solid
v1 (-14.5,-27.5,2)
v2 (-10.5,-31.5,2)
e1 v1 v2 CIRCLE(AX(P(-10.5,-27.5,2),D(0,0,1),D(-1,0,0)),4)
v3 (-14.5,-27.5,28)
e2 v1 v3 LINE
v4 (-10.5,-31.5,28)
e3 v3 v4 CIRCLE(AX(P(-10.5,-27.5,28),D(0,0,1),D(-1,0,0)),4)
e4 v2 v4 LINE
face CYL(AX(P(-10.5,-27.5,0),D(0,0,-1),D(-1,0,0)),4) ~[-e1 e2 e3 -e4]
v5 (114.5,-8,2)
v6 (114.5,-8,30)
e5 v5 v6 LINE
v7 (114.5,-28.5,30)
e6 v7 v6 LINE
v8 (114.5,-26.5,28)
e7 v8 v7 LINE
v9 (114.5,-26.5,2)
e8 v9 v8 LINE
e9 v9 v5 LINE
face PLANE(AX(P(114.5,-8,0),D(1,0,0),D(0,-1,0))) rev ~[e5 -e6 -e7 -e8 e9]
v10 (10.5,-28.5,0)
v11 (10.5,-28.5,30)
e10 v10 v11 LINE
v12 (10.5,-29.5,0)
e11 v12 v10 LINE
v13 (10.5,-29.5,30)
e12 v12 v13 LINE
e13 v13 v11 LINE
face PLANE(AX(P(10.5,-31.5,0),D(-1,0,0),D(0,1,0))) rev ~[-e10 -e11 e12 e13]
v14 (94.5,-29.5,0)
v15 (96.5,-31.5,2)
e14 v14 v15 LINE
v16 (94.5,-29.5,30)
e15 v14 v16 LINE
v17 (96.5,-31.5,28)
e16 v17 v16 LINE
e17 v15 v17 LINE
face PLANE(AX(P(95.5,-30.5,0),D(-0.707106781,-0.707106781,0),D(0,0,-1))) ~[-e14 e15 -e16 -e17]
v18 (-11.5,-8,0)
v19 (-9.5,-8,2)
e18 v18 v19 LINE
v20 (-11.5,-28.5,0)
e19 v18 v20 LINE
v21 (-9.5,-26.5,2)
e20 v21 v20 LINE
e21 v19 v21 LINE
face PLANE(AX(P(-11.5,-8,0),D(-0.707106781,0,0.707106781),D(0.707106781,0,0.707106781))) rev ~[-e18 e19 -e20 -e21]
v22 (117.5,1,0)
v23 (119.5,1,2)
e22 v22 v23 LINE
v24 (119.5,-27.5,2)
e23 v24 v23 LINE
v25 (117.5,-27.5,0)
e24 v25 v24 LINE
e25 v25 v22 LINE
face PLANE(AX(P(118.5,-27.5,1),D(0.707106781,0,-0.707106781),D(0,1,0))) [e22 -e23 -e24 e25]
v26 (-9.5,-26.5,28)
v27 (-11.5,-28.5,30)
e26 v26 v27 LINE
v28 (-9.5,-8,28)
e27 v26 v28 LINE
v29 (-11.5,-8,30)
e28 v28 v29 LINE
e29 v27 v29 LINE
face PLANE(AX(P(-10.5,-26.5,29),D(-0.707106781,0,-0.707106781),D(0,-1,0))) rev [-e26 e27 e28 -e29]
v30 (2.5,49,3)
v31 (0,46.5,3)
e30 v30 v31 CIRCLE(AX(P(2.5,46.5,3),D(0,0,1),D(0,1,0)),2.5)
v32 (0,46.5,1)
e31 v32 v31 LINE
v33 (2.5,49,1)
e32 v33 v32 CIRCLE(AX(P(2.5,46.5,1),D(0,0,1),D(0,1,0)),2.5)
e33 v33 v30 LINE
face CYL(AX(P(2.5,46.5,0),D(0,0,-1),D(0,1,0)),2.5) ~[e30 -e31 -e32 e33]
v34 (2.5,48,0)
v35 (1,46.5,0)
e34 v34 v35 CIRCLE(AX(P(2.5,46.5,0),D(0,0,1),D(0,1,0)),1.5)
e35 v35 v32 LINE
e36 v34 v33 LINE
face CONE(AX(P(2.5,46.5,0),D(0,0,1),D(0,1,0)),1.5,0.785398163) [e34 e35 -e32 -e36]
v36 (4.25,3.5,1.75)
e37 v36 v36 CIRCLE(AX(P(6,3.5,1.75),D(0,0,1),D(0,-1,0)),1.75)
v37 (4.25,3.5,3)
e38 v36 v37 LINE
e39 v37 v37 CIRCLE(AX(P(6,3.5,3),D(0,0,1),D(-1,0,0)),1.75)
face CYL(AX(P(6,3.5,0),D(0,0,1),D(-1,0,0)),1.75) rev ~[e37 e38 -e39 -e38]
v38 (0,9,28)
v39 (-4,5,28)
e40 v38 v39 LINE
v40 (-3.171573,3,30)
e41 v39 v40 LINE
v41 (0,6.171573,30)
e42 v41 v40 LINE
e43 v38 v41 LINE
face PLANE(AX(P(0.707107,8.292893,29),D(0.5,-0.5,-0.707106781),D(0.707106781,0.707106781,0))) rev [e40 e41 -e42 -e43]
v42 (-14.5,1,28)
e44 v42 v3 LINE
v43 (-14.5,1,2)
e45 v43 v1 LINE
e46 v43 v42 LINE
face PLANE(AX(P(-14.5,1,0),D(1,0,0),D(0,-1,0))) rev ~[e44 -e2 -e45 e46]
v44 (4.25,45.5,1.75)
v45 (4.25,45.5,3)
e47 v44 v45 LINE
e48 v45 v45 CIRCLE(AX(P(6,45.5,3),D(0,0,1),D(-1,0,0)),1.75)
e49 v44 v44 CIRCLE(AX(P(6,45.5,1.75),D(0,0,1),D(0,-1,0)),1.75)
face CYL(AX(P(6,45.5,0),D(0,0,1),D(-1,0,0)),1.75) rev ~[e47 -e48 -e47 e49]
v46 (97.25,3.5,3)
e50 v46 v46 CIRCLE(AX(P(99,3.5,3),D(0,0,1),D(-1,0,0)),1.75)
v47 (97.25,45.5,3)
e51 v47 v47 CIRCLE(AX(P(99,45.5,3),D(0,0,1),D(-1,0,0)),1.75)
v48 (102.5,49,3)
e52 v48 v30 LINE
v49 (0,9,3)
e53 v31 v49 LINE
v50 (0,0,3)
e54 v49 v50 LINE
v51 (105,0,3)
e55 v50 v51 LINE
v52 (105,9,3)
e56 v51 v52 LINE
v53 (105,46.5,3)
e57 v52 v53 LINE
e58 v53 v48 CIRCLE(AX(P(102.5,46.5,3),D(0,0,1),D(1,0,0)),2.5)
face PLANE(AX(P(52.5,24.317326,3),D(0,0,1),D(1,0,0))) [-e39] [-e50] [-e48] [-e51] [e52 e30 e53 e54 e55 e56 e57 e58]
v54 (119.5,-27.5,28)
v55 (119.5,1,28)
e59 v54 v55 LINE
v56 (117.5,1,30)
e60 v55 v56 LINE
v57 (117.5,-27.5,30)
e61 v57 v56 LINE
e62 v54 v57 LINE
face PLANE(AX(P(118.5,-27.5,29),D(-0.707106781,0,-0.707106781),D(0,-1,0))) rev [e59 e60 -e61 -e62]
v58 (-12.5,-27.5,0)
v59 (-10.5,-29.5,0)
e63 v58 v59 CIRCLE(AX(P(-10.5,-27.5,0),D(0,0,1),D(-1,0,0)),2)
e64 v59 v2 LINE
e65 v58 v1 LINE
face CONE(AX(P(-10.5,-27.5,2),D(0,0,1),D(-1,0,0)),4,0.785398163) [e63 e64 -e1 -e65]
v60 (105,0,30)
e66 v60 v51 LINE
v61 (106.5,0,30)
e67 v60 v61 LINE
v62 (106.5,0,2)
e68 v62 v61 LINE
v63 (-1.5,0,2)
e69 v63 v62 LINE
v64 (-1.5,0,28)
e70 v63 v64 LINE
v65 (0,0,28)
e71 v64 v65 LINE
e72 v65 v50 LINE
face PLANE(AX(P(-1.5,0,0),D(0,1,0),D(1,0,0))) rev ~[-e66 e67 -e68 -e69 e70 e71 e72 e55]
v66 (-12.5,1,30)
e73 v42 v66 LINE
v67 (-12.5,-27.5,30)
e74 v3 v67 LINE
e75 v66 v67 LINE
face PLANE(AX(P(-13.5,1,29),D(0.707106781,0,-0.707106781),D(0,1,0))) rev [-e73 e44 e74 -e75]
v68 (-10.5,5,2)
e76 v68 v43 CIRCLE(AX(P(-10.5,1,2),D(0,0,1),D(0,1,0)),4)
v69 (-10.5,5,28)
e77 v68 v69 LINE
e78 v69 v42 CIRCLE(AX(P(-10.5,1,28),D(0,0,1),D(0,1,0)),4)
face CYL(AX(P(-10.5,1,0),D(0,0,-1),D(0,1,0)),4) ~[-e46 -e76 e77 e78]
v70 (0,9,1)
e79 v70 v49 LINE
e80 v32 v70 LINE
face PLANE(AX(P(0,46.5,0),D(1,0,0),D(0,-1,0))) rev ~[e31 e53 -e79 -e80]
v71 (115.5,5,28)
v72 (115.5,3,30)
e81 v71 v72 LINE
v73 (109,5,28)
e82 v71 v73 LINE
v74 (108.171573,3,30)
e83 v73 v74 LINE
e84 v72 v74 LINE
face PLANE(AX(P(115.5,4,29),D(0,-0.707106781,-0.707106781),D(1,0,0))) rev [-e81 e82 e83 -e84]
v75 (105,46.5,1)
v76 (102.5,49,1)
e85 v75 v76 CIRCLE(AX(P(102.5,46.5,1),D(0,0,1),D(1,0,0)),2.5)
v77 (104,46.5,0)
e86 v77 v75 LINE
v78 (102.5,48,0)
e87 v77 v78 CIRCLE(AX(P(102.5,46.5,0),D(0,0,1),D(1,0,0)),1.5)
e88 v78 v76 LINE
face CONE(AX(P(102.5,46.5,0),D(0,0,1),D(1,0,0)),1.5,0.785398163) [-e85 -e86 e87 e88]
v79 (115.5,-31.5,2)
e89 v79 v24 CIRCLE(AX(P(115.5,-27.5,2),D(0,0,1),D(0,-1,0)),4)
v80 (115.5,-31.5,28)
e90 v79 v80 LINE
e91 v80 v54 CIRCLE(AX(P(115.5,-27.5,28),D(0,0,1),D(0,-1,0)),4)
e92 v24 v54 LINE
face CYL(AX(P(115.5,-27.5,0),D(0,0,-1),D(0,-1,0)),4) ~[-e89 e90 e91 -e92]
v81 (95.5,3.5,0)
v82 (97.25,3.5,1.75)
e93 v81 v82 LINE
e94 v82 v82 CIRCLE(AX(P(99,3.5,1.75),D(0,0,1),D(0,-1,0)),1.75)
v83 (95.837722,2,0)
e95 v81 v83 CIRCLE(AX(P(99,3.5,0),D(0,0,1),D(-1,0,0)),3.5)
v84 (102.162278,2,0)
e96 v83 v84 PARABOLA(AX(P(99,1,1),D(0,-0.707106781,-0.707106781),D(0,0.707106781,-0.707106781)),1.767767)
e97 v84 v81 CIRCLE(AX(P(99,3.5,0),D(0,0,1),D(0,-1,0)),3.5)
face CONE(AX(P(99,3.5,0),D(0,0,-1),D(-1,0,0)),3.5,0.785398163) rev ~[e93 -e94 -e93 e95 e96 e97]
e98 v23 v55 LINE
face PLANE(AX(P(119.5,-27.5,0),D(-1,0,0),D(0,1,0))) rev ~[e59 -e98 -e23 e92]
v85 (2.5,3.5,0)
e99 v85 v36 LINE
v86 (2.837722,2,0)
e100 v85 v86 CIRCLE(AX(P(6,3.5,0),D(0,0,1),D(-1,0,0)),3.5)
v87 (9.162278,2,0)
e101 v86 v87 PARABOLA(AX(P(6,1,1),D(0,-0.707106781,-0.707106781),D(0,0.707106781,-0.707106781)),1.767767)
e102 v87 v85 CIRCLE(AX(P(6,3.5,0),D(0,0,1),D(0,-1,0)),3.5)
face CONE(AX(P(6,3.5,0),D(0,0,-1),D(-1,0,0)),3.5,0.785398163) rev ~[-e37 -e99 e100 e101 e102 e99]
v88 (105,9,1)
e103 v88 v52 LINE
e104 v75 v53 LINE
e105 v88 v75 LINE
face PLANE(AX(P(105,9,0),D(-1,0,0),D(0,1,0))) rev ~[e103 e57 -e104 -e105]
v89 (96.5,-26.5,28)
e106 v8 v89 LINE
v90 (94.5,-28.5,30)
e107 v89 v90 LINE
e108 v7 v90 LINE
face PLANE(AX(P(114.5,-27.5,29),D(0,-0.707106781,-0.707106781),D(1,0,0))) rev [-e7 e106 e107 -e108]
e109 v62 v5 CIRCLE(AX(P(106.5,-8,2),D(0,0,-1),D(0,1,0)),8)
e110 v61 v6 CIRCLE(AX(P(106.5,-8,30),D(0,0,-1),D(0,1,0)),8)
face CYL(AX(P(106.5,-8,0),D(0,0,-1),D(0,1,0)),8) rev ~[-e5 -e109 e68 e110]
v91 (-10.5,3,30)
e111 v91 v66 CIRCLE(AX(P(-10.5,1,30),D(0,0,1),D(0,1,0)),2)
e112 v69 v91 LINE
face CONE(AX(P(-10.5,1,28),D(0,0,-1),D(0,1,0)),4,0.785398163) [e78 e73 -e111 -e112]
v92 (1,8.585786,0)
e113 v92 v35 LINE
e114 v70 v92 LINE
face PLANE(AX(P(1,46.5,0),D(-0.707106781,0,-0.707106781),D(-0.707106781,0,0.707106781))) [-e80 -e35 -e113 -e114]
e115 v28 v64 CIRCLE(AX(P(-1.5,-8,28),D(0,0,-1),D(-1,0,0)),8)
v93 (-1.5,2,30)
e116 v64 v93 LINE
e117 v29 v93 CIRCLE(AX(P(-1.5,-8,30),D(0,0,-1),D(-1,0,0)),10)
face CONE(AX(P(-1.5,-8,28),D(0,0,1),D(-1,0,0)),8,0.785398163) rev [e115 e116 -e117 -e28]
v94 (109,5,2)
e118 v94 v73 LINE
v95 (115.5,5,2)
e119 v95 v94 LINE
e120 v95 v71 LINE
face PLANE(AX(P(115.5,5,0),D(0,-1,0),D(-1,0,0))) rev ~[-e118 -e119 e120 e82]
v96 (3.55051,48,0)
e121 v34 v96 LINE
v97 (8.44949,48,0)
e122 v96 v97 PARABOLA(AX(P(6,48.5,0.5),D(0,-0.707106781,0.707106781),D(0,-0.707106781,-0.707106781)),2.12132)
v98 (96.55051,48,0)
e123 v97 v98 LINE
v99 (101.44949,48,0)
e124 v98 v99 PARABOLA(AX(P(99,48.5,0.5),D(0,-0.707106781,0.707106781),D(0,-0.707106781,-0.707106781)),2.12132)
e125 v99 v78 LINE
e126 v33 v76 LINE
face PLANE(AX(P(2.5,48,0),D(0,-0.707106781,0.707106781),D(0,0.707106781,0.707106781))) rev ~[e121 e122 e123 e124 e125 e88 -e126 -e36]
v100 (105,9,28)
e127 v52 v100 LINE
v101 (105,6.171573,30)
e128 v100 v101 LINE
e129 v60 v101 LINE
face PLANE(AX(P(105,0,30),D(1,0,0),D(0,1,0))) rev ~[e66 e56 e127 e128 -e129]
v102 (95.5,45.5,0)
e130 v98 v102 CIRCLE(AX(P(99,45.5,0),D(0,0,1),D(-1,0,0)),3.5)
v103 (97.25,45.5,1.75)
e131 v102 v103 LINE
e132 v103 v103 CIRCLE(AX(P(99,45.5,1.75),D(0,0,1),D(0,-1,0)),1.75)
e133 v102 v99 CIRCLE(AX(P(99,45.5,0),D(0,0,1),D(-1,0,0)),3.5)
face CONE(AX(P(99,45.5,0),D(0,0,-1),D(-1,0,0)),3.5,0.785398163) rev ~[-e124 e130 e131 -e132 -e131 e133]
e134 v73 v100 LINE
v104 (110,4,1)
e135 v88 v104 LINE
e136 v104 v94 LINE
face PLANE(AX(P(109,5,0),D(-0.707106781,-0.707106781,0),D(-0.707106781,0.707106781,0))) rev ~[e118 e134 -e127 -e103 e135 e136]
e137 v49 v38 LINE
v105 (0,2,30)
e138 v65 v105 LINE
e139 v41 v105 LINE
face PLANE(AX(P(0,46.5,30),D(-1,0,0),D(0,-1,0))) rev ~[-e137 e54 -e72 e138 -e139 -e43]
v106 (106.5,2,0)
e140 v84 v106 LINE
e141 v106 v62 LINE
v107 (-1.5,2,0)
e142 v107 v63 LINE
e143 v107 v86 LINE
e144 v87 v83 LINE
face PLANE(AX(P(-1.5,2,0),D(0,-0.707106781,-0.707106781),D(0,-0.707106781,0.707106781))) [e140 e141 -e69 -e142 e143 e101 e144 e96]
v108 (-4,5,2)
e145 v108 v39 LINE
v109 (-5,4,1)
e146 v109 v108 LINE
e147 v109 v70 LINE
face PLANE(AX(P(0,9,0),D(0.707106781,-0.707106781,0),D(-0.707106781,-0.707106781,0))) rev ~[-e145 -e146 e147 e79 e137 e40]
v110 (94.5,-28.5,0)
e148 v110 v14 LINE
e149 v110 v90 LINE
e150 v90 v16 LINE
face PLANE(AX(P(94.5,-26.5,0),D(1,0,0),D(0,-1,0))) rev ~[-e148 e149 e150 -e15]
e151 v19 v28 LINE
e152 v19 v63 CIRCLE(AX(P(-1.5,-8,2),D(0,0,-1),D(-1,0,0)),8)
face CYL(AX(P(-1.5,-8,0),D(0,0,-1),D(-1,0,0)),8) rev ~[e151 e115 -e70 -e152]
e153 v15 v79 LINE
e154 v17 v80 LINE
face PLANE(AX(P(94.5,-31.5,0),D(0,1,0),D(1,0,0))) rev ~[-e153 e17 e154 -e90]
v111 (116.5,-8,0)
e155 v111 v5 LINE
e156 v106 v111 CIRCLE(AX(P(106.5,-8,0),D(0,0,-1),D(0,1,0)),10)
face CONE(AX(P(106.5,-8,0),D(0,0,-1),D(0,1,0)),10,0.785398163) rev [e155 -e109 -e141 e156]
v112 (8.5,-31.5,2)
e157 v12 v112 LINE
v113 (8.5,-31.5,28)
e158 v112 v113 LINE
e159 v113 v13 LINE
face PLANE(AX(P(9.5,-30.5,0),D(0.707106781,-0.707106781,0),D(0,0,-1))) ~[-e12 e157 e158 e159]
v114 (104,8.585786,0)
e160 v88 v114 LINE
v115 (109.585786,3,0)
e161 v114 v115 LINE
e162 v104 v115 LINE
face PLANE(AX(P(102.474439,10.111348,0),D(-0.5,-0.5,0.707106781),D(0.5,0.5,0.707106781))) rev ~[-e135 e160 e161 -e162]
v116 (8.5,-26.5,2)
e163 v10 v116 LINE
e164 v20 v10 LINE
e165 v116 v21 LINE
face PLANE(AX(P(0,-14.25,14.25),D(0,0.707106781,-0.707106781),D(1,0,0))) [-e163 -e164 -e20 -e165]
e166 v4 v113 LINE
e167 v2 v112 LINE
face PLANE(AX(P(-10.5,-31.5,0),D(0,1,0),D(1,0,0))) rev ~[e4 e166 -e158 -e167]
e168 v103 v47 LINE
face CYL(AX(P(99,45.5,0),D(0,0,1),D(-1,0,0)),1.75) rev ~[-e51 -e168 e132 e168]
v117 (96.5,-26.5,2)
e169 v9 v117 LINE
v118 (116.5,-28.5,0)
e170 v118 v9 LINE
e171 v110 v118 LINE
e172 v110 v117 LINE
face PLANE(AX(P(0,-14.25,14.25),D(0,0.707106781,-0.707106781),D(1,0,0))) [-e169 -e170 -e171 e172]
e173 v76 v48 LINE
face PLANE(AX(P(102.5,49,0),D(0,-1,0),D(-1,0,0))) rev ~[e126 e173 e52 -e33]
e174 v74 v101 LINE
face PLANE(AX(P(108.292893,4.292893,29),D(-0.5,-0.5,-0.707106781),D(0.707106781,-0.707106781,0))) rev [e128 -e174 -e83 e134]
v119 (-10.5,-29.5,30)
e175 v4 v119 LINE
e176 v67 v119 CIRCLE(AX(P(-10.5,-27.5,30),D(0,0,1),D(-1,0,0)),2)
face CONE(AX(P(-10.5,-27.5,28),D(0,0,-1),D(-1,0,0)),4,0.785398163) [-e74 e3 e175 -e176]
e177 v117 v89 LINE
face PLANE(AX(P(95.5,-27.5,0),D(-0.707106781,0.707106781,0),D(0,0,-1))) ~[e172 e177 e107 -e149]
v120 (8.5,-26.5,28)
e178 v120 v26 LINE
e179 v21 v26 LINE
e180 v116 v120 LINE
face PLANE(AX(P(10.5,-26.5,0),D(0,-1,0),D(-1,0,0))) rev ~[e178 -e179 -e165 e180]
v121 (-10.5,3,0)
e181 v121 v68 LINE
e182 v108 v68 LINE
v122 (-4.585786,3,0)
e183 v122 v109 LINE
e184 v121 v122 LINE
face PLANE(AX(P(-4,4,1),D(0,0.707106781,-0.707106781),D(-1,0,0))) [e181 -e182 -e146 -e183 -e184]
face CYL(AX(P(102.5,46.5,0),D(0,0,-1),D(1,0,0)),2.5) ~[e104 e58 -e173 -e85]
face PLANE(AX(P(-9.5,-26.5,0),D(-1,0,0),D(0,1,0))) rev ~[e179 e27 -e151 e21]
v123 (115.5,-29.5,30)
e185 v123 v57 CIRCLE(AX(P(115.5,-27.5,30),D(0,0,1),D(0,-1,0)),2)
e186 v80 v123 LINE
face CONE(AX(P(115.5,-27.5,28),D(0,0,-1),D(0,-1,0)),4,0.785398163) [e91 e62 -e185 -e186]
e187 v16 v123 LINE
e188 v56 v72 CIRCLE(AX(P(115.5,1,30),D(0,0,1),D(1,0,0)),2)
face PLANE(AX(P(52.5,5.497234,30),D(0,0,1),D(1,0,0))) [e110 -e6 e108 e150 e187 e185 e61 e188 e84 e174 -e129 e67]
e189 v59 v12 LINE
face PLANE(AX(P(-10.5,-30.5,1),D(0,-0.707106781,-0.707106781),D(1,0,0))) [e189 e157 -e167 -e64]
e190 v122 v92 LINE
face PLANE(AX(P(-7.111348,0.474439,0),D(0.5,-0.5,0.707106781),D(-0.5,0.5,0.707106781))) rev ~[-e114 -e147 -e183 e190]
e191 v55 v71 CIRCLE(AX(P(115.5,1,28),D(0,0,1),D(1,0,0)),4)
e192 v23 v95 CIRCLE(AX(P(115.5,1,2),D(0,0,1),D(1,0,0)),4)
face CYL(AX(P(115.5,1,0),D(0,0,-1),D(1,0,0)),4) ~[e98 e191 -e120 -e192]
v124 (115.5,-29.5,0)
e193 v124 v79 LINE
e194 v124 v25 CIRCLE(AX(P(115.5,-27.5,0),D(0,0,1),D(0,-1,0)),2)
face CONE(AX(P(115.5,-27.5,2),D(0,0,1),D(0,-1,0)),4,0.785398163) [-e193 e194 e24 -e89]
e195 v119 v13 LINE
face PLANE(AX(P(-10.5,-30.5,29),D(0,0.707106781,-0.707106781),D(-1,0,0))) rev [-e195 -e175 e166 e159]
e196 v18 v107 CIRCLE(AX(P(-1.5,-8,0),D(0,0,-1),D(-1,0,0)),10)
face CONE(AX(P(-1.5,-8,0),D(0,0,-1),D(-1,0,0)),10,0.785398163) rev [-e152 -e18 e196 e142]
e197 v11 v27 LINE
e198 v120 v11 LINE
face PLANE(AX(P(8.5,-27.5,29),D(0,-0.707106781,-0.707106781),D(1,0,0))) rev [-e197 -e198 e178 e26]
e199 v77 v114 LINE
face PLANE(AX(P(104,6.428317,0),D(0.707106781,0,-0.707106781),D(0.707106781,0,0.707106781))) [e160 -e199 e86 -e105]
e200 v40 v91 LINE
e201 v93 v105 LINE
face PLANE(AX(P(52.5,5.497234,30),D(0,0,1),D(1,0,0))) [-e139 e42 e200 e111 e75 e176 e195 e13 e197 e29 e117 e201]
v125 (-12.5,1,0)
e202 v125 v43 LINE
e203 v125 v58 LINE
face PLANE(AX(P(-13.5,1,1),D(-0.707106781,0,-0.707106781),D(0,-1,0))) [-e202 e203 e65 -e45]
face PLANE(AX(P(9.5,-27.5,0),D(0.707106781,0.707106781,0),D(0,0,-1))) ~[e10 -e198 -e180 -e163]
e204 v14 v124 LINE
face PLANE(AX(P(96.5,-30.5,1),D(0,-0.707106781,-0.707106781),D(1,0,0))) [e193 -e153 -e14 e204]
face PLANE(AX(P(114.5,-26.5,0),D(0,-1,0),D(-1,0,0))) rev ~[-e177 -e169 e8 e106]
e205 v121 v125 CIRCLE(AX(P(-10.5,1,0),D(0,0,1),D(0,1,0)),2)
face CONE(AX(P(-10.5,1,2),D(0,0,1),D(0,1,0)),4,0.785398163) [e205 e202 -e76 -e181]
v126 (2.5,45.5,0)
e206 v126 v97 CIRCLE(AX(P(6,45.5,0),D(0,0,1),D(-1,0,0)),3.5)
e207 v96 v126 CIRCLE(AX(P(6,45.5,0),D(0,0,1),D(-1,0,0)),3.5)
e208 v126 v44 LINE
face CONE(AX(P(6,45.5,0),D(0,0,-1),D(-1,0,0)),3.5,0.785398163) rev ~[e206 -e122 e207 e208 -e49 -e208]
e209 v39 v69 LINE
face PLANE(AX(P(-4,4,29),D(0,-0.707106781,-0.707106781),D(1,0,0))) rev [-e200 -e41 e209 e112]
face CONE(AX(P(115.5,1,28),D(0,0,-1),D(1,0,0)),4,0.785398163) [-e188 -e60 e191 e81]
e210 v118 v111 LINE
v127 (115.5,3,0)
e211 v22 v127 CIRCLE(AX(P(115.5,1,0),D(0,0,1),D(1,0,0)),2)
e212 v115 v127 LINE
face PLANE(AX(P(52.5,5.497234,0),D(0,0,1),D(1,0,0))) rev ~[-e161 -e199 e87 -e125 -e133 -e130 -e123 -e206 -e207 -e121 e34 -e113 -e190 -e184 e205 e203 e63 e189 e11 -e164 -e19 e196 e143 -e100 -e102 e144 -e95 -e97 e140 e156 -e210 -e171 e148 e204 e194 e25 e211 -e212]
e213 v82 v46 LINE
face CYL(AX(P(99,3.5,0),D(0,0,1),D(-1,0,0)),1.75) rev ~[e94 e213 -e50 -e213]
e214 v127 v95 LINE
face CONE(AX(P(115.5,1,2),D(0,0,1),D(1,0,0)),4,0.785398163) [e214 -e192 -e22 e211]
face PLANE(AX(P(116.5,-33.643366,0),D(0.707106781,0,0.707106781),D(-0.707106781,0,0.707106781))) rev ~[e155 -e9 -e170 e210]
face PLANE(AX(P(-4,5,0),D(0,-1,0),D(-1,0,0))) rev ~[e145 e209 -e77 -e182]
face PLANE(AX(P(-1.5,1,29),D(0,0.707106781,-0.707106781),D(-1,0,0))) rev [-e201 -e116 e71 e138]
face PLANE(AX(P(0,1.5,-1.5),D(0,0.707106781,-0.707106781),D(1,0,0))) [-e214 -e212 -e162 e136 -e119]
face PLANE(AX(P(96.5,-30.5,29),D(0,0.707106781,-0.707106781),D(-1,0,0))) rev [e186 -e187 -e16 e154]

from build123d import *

# Parameters (mm, degrees)
F1_DEPTH       = 30
F3_DEPTH       = 27
F4_SIZE        = 2
F5_SIZE        = 2
F7_D           = 3.5
F7_CSINK_D     = 7
F7_CSINK_ANGLE = 90
F8_T1_DEPTH    = 108
F8_T6_DEPTH    = 25.6433659759
F8_T12_DEPTH   = 25.6433659759
F8_T17_DEPTH   = 25.6433659759
F8_T22_DEPTH   = 25.6433659759
F8_T26_ANGLE   = 90
F8_T28_ANGLE   = 90
F9_T1_DEPTH    = 100
F9_T6_DEPTH    = 40.0716830997
F9_T11_DEPTH   = 13.6286473502
F9_T17_DEPTH   = 13.6286473502
F9_T21_ANGLE   = 90
F9_T23_ANGLE   = 90
F9_T27_DEPTH   = 40.0716830997
F9_T33_DEPTH   = 13.6286473502
F9_T37_DEPTH   = 40.0716830997
F9_T44_DEPTH   = 40.0716830997
F9_T48_DEPTH   = 13.6286473502


# Not quite as in the source:
# - a fillet or chamfer that OpenCascade refuses, or shapes differently, is made with other operations: its cross-section is extruded or revolved along the edge and cut away or added


with BuildPart() as f1:
    # F0 (on Top) → F1 (new body)
    with BuildSketch(Plane.XY):
        with BuildLine():
            Line((-1.5, 0), (0, 0))
            Line((0, 0), (105, 0))
            Line((105, 0), (106.5, 0))
            ThreePointArc((106.5, 0), (112.1568542495, -2.3431457505), (114.5, -8))
            Line((114.5, -8), (114.5, -26.5))
            Line((114.5, -26.5), (94.5, -26.5))
            Line((94.5, -26.5), (94.5, -31.4999998882))
            Line((94.5, -31.4999998882), (115.4999998882, -31.4999998882))
            ThreePointArc((115.4999998882, -31.4999998882), (118.328427013, -30.328427013), (119.4999998882, -27.4999998882))
            Line((119.4999998882, -27.4999998882), (119.4999998882, 0.9999998882))
            ThreePointArc((119.4999998882, 0.9999998882), (118.328427013, 3.828427013), (115.4999998882, 4.9999998882))
            Line((115.4999998882, 4.9999998882), (109, 4.9999998882))
            Line((109, 4.9999998882), (105, 8.9999998882))
            Line((105, 8.9999998882), (105, 46.5))
            ThreePointArc((105, 46.5), (104.267766953, 48.267766953), (102.5, 49))
            Line((102.5, 49), (2.5, 49))
            ThreePointArc((2.5, 49), (0.732233047, 48.267766953), (0, 46.5))
            Line((0, 46.5), (0, 8.9999998882))
            Line((0, 8.9999998882), (-4, 4.9999998882))
            Line((-4, 4.9999998882), (-10.4999998882, 4.9999998882))
            ThreePointArc((-10.4999998882, 4.9999998882), (-13.328427013, 3.828427013), (-14.4999998882, 0.9999998882))
            Line((-14.4999998882, 0.9999998882), (-14.4999998882, -27.4999998882))
            ThreePointArc((-14.4999998882, -27.4999998882), (-13.328427013, -30.328427013), (-10.4999998882, -31.4999998882))
            Line((-10.4999998882, -31.4999998882), (10.5, -31.4999998882))
            Line((10.5, -31.4999998882), (10.5, -26.5))
            Line((10.5, -26.5), (-9.5, -26.5))
            Line((-9.5, -26.5), (-9.5, -8))
            ThreePointArc((-9.5, -8), (-7.1568542495, -2.3431457505), (-1.5, 0))
        make_face()
    extrude(amount=F1_DEPTH)

    # F2 (on face) → F3 (cut)
    with BuildSketch(Plane.XY.offset(30)):
        with BuildLine():
            Line((0, 0), (105, 0))
            Line((105, 0), (105, 4.9999998882))
            Line((105, 4.9999998882), (105, 8.9999998882))
            Line((105, 8.9999998882), (105, 46.5))
            ThreePointArc((105, 46.5), (104.267766953, 48.267766953), (102.5, 49))
            Line((102.5, 49), (2.5, 49))
            ThreePointArc((2.5, 49), (0.732233047, 48.267766953), (0, 46.5))
            Line((0, 46.5), (0, 8.9999998882))
            Line((0, 8.9999998882), (0, 4.9999998882))
            Line((0, 4.9999998882), (0, 0))
        make_face()
    extrude(amount=-F3_DEPTH, mode=Mode.SUBTRACT)

    # F4
    f4_edges = [f1.edges().sort_by_distance(p)[0] for p in [
        (94.5, -26.5, 15),
        (94.5, -31.5, 15),
        (10.5, -31.5, 15),
        (10.5, -26.5, 15),
    ]]
    chamfer(f4_edges, length=F4_SIZE)

    # F5
    f5_edges = [f1.edges().sort_by_distance(p)[0] for p in [
        (105.5, -26.5, 0),
        (-0.5, -26.5, 0),
        (-1, -31.5, 0),
        (106, -31.5, 0),
        (-7.25, 5, 30),
        (-9.5, -17.25, 30),
        (-0.5, -26.5, 30),
        (105.5, -26.5, 30),
        (106, -31.5, 30),
        (107, 7, 30),
        (-2, 7, 30),
    ]]
    chamfer(f5_edges, length=F5_SIZE)

    # F7 (through all)
    with Locations(Plane(origin=(0, 0, 0), x_dir=(1, 0, 0), z_dir=(0, 0, -1))):
        with Locations((6, -3.5), (6, -45.5), (99, -3.5), (99, -45.5)):
            CounterSinkHole(F7_D / 2, F7_CSINK_D / 2, counter_sink_angle=F7_CSINK_ANGLE)

    # F8: chamfer of 2 on 5 edges, made by hand

    # F8_s2 → F8_t1 (cut)
    with BuildSketch(Plane.YZ.offset(-1.5)):
        Polygon((2, 0), (0, 2), (0, 0), align=None)
    extrude(amount=F8_T1_DEPTH, mode=Mode.SUBTRACT)


with BuildPart() as f8_tool4:
    # F8_s5 → F8_t6 (new body)
    with BuildSketch(Plane.XZ.offset(33.6433659759)):
        Polygon((116.5, 0), (114.5, 2), (114.5, 0), align=None)
    extrude(amount=-F8_T6_DEPTH)

    split(bisect_by=Plane.XZ.offset(26.5), keep=Keep.TOP)

    split(bisect_by=Plane(origin=(0, -14.25, 14.25), x_dir=(1, 0, 0), z_dir=(0, 0.7071067812, -0.7071067812)), keep=Keep.TOP)


with BuildPart() as f1_1:
    add(f1.part)

    # F8_t3: cut F8_tool4
    add(f8_tool4.part, mode=Mode.SUBTRACT)


with BuildPart() as f8_tool10:
    # F8_s11 → F8_t12 (new body)
    with BuildSketch(Plane.XZ.offset(33.6433659759)):
        Polygon((116.5, 0), (114.5, 2), (114.5, 0), align=None)
    extrude(amount=-F8_T12_DEPTH)

    split(bisect_by=Plane.XZ.offset(26.5), keep=Keep.BOTTOM)


with BuildPart() as f1_2:
    add(f1_1.part)

    # F8_t9: cut F8_tool10
    add(f8_tool10.part, mode=Mode.SUBTRACT)


with BuildPart() as f8_tool15:
    # F8_s16 → F8_t17 (new body)
    with BuildSketch(Plane.XZ.offset(8)):
        Polygon((-11.5, 0), (-9.5, 2), (-9.5, 0), align=None)
    extrude(amount=F8_T17_DEPTH)

    split(bisect_by=Plane.XZ.offset(26.5), keep=Keep.BOTTOM)


with BuildPart() as f1_3:
    add(f1_2.part)

    # F8_t14: cut F8_tool15
    add(f8_tool15.part, mode=Mode.SUBTRACT)


with BuildPart() as f8_tool20:
    # F8_s21 → F8_t22 (new body)
    with BuildSketch(Plane.XZ.offset(8)):
        Polygon((-11.5, 0), (-9.5, 2), (-9.5, 0), align=None)
    extrude(amount=F8_T22_DEPTH)

    split(bisect_by=Plane.XZ.offset(26.5), keep=Keep.TOP)

    split(bisect_by=Plane(origin=(0, -14.25, 14.25), x_dir=(1, 0, 0), z_dir=(0, 0.7071067812, -0.7071067812)), keep=Keep.TOP)


with BuildPart() as f1_4:
    add(f1_3.part)

    # F8_t19: cut F8_tool20
    add(f8_tool20.part, mode=Mode.SUBTRACT)

    # F8_s25 → F8_t26 (revolve, cut)
    with BuildSketch(Plane.XZ.offset(8)):
        Polygon((-11.5, 0), (-9.5, 2), (-9.5, 0), align=None)
    revolve(axis=Axis((-1.5, -8, 0), (0, 0, -1)), revolution_arc=F8_T26_ANGLE, mode=Mode.SUBTRACT)

    # F8_s27 → F8_t28 (revolve, cut)
    with BuildSketch(Plane.YZ.offset(106.5)):
        Polygon((2, 0), (0, 2), (0, 0), align=None)
    revolve(axis=Axis((106.5, -8, 0), (0, 0, -1)), revolution_arc=F8_T28_ANGLE, mode=Mode.SUBTRACT)

    # F9: chamfer of 1 on 7 edges, made by hand

    # F9_s2 → F9_t1 (cut)
    with BuildSketch(Plane.YZ.offset(2.5)):
        Polygon((48, 0), (49, 1), (49, 0), align=None)
    extrude(amount=F9_T1_DEPTH, mode=Mode.SUBTRACT)


with BuildPart() as f9_tool4:
    # F9_s5 → F9_t6 (new body)
    with BuildSketch(Plane.XZ.offset(-46.5)):
        Polygon((1, 0), (0, 1), (0, 0), align=None)
    extrude(amount=F9_T6_DEPTH)

    split(bisect_by=Plane(origin=(-4.4999999441, 4.4999999441, 0), x_dir=(0, 0, 1), z_dir=(-0.7071067812, 0.7071067812, 0)), keep=Keep.TOP)


with BuildPart() as f1_5:
    add(f1_4.part)

    # F9_t3: cut F9_tool4
    add(f9_tool4.part, mode=Mode.SUBTRACT)


with BuildPart() as f9_tool9:
    # F9_s10 → F9_t11 (new body)
    with BuildSketch(Plane(origin=(-3.3184545357, -3.3184545357, 0), x_dir=(0, 0, 1), z_dir=(0.7071067812, 0.7071067812, 0))):
        Polygon((0, -5.3639609517), (1, -6.3639609517), (0, -6.3639609517), align=None)
    extrude(amount=F9_T11_DEPTH)

    split(bisect_by=Plane(origin=(0, 1.4999999441, -1.4999999441), x_dir=(1, 0, 0), z_dir=(0, 0.7071067812, -0.7071067812)), keep=Keep.TOP)

    split(bisect_by=Plane.YZ, keep=Keep.BOTTOM)


with BuildPart() as f1_6:
    add(f1_5.part)

    # F9_t8: cut F9_tool9
    add(f9_tool9.part, mode=Mode.SUBTRACT)


with BuildPart() as f9_tool15:
    # F9_s16 → F9_t17 (new body)
    with BuildSketch(Plane(origin=(46.181545576, -46.181545576, 0), x_dir=(0, 0, 1), z_dir=(0.7071067812, -0.7071067812, 0))):
        Polygon((0, -79.6101729762), (1, -80.6101729762), (0, -80.6101729762), align=None)
    extrude(amount=F9_T17_DEPTH)

    split(bisect_by=Plane.YZ.offset(105), keep=Keep.TOP)

    split(bisect_by=Plane(origin=(0, 1.4999999441, -1.4999999441), x_dir=(1, 0, 0), z_dir=(0, 0.7071067812, -0.7071067812)), keep=Keep.TOP)


with BuildPart() as f1_7:
    add(f1_6.part)

    # F9_t14: cut F9_tool15
    add(f9_tool15.part, mode=Mode.SUBTRACT)

    # F9_s20 → F9_t21 (revolve, cut)
    with BuildSketch(Plane.YZ.offset(2.5)):
        Polygon((48, 0), (49, 1), (49, 0), align=None)
    revolve(axis=Axis((2.5, 46.5, 0), (0, 0, 1)), revolution_arc=F9_T21_ANGLE, mode=Mode.SUBTRACT)

    # F9_s22 → F9_t23 (revolve, cut)
    with BuildSketch(Plane.XZ.offset(-46.5)):
        Polygon((104, 0), (105, 1), (105, 0), align=None)
    revolve(axis=Axis((102.5, 46.5, 0), (0, 0, 1)), revolution_arc=F9_T23_ANGLE, mode=Mode.SUBTRACT)


with BuildPart() as f9_tool25:
    # F9_s26 → F9_t27 (new body)
    with BuildSketch(Plane.XZ.offset(-6.4283169003)):
        Polygon((104, 0), (105, 1), (105, 0), align=None)
    extrude(amount=-F9_T27_DEPTH)

    split(bisect_by=Plane(origin=(56.9999999441, 56.9999999441, 0), x_dir=(0, 0, 1), z_dir=(0.7071067812, 0.7071067812, 0)), keep=Keep.TOP)


with BuildPart() as f1_8:
    add(f1_7.part)

    # F9_t24: cut F9_tool25
    add(f9_tool25.part, mode=Mode.SUBTRACT)


with BuildPart() as f9_tool31:
    # F9_s32 → F9_t33 (new body)
    with BuildSketch(Plane(origin=(-3.3184545357, -3.3184545357, 0), x_dir=(0, 0, 1), z_dir=(0.7071067812, 0.7071067812, 0))):
        Polygon((0, -5.3639609517), (1, -6.3639609517), (0, -6.3639609517), align=None)
    extrude(amount=F9_T33_DEPTH)

    split(bisect_by=Plane.YZ, keep=Keep.TOP)


with BuildPart() as f9_tool35:
    # F9_s36 → F9_t37 (new body)
    with BuildSketch(Plane.XZ.offset(-46.5)):
        Polygon((1, 0), (0, 1), (0, 0), align=None)
    extrude(amount=F9_T37_DEPTH)

    split(bisect_by=Plane(origin=(-4.4999999441, 4.4999999441, 0), x_dir=(0, 0, 1), z_dir=(0.7071067812, -0.7071067812, 0)), keep=Keep.TOP)


with BuildPart() as f9_tool31_1:
    add(f9_tool31.part)

    # F9_t39: intersect F9_tool35
    add(f9_tool35.part, mode=Mode.INTERSECT)


with BuildPart() as f1_9:
    add(f1_8.part)

    # F9_t29: cut F9_tool31
    add(f9_tool31_1.part, mode=Mode.SUBTRACT)


with BuildPart() as f9_tool42:
    # F9_s43 → F9_t44 (new body)
    with BuildSketch(Plane.XZ.offset(-6.4283169003)):
        Polygon((104, 0), (105, 1), (105, 0), align=None)
    extrude(amount=-F9_T44_DEPTH)

    split(bisect_by=Plane(origin=(56.9999999441, 56.9999999441, 0), x_dir=(0, 0, 1), z_dir=(-0.7071067812, -0.7071067812, 0)), keep=Keep.TOP)


with BuildPart() as f9_tool46:
    # F9_s47 → F9_t48 (new body)
    with BuildSketch(Plane(origin=(46.181545576, -46.181545576, 0), x_dir=(0, 0, 1), z_dir=(0.7071067812, -0.7071067812, 0))):
        Polygon((0, -79.6101729762), (1, -80.6101729762), (0, -80.6101729762), align=None)
    extrude(amount=F9_T48_DEPTH)

    split(bisect_by=Plane.YZ.offset(105), keep=Keep.BOTTOM)


with BuildPart() as f9_tool42_1:
    add(f9_tool42.part)

    # F9_t50: intersect F9_tool46
    add(f9_tool46.part, mode=Mode.INTERSECT)


with BuildPart() as f1_10:
    add(f1_9.part)

    # F9_t40: cut F9_tool42
    add(f9_tool42_1.part, mode=Mode.SUBTRACT)


solid = f1_10.part
